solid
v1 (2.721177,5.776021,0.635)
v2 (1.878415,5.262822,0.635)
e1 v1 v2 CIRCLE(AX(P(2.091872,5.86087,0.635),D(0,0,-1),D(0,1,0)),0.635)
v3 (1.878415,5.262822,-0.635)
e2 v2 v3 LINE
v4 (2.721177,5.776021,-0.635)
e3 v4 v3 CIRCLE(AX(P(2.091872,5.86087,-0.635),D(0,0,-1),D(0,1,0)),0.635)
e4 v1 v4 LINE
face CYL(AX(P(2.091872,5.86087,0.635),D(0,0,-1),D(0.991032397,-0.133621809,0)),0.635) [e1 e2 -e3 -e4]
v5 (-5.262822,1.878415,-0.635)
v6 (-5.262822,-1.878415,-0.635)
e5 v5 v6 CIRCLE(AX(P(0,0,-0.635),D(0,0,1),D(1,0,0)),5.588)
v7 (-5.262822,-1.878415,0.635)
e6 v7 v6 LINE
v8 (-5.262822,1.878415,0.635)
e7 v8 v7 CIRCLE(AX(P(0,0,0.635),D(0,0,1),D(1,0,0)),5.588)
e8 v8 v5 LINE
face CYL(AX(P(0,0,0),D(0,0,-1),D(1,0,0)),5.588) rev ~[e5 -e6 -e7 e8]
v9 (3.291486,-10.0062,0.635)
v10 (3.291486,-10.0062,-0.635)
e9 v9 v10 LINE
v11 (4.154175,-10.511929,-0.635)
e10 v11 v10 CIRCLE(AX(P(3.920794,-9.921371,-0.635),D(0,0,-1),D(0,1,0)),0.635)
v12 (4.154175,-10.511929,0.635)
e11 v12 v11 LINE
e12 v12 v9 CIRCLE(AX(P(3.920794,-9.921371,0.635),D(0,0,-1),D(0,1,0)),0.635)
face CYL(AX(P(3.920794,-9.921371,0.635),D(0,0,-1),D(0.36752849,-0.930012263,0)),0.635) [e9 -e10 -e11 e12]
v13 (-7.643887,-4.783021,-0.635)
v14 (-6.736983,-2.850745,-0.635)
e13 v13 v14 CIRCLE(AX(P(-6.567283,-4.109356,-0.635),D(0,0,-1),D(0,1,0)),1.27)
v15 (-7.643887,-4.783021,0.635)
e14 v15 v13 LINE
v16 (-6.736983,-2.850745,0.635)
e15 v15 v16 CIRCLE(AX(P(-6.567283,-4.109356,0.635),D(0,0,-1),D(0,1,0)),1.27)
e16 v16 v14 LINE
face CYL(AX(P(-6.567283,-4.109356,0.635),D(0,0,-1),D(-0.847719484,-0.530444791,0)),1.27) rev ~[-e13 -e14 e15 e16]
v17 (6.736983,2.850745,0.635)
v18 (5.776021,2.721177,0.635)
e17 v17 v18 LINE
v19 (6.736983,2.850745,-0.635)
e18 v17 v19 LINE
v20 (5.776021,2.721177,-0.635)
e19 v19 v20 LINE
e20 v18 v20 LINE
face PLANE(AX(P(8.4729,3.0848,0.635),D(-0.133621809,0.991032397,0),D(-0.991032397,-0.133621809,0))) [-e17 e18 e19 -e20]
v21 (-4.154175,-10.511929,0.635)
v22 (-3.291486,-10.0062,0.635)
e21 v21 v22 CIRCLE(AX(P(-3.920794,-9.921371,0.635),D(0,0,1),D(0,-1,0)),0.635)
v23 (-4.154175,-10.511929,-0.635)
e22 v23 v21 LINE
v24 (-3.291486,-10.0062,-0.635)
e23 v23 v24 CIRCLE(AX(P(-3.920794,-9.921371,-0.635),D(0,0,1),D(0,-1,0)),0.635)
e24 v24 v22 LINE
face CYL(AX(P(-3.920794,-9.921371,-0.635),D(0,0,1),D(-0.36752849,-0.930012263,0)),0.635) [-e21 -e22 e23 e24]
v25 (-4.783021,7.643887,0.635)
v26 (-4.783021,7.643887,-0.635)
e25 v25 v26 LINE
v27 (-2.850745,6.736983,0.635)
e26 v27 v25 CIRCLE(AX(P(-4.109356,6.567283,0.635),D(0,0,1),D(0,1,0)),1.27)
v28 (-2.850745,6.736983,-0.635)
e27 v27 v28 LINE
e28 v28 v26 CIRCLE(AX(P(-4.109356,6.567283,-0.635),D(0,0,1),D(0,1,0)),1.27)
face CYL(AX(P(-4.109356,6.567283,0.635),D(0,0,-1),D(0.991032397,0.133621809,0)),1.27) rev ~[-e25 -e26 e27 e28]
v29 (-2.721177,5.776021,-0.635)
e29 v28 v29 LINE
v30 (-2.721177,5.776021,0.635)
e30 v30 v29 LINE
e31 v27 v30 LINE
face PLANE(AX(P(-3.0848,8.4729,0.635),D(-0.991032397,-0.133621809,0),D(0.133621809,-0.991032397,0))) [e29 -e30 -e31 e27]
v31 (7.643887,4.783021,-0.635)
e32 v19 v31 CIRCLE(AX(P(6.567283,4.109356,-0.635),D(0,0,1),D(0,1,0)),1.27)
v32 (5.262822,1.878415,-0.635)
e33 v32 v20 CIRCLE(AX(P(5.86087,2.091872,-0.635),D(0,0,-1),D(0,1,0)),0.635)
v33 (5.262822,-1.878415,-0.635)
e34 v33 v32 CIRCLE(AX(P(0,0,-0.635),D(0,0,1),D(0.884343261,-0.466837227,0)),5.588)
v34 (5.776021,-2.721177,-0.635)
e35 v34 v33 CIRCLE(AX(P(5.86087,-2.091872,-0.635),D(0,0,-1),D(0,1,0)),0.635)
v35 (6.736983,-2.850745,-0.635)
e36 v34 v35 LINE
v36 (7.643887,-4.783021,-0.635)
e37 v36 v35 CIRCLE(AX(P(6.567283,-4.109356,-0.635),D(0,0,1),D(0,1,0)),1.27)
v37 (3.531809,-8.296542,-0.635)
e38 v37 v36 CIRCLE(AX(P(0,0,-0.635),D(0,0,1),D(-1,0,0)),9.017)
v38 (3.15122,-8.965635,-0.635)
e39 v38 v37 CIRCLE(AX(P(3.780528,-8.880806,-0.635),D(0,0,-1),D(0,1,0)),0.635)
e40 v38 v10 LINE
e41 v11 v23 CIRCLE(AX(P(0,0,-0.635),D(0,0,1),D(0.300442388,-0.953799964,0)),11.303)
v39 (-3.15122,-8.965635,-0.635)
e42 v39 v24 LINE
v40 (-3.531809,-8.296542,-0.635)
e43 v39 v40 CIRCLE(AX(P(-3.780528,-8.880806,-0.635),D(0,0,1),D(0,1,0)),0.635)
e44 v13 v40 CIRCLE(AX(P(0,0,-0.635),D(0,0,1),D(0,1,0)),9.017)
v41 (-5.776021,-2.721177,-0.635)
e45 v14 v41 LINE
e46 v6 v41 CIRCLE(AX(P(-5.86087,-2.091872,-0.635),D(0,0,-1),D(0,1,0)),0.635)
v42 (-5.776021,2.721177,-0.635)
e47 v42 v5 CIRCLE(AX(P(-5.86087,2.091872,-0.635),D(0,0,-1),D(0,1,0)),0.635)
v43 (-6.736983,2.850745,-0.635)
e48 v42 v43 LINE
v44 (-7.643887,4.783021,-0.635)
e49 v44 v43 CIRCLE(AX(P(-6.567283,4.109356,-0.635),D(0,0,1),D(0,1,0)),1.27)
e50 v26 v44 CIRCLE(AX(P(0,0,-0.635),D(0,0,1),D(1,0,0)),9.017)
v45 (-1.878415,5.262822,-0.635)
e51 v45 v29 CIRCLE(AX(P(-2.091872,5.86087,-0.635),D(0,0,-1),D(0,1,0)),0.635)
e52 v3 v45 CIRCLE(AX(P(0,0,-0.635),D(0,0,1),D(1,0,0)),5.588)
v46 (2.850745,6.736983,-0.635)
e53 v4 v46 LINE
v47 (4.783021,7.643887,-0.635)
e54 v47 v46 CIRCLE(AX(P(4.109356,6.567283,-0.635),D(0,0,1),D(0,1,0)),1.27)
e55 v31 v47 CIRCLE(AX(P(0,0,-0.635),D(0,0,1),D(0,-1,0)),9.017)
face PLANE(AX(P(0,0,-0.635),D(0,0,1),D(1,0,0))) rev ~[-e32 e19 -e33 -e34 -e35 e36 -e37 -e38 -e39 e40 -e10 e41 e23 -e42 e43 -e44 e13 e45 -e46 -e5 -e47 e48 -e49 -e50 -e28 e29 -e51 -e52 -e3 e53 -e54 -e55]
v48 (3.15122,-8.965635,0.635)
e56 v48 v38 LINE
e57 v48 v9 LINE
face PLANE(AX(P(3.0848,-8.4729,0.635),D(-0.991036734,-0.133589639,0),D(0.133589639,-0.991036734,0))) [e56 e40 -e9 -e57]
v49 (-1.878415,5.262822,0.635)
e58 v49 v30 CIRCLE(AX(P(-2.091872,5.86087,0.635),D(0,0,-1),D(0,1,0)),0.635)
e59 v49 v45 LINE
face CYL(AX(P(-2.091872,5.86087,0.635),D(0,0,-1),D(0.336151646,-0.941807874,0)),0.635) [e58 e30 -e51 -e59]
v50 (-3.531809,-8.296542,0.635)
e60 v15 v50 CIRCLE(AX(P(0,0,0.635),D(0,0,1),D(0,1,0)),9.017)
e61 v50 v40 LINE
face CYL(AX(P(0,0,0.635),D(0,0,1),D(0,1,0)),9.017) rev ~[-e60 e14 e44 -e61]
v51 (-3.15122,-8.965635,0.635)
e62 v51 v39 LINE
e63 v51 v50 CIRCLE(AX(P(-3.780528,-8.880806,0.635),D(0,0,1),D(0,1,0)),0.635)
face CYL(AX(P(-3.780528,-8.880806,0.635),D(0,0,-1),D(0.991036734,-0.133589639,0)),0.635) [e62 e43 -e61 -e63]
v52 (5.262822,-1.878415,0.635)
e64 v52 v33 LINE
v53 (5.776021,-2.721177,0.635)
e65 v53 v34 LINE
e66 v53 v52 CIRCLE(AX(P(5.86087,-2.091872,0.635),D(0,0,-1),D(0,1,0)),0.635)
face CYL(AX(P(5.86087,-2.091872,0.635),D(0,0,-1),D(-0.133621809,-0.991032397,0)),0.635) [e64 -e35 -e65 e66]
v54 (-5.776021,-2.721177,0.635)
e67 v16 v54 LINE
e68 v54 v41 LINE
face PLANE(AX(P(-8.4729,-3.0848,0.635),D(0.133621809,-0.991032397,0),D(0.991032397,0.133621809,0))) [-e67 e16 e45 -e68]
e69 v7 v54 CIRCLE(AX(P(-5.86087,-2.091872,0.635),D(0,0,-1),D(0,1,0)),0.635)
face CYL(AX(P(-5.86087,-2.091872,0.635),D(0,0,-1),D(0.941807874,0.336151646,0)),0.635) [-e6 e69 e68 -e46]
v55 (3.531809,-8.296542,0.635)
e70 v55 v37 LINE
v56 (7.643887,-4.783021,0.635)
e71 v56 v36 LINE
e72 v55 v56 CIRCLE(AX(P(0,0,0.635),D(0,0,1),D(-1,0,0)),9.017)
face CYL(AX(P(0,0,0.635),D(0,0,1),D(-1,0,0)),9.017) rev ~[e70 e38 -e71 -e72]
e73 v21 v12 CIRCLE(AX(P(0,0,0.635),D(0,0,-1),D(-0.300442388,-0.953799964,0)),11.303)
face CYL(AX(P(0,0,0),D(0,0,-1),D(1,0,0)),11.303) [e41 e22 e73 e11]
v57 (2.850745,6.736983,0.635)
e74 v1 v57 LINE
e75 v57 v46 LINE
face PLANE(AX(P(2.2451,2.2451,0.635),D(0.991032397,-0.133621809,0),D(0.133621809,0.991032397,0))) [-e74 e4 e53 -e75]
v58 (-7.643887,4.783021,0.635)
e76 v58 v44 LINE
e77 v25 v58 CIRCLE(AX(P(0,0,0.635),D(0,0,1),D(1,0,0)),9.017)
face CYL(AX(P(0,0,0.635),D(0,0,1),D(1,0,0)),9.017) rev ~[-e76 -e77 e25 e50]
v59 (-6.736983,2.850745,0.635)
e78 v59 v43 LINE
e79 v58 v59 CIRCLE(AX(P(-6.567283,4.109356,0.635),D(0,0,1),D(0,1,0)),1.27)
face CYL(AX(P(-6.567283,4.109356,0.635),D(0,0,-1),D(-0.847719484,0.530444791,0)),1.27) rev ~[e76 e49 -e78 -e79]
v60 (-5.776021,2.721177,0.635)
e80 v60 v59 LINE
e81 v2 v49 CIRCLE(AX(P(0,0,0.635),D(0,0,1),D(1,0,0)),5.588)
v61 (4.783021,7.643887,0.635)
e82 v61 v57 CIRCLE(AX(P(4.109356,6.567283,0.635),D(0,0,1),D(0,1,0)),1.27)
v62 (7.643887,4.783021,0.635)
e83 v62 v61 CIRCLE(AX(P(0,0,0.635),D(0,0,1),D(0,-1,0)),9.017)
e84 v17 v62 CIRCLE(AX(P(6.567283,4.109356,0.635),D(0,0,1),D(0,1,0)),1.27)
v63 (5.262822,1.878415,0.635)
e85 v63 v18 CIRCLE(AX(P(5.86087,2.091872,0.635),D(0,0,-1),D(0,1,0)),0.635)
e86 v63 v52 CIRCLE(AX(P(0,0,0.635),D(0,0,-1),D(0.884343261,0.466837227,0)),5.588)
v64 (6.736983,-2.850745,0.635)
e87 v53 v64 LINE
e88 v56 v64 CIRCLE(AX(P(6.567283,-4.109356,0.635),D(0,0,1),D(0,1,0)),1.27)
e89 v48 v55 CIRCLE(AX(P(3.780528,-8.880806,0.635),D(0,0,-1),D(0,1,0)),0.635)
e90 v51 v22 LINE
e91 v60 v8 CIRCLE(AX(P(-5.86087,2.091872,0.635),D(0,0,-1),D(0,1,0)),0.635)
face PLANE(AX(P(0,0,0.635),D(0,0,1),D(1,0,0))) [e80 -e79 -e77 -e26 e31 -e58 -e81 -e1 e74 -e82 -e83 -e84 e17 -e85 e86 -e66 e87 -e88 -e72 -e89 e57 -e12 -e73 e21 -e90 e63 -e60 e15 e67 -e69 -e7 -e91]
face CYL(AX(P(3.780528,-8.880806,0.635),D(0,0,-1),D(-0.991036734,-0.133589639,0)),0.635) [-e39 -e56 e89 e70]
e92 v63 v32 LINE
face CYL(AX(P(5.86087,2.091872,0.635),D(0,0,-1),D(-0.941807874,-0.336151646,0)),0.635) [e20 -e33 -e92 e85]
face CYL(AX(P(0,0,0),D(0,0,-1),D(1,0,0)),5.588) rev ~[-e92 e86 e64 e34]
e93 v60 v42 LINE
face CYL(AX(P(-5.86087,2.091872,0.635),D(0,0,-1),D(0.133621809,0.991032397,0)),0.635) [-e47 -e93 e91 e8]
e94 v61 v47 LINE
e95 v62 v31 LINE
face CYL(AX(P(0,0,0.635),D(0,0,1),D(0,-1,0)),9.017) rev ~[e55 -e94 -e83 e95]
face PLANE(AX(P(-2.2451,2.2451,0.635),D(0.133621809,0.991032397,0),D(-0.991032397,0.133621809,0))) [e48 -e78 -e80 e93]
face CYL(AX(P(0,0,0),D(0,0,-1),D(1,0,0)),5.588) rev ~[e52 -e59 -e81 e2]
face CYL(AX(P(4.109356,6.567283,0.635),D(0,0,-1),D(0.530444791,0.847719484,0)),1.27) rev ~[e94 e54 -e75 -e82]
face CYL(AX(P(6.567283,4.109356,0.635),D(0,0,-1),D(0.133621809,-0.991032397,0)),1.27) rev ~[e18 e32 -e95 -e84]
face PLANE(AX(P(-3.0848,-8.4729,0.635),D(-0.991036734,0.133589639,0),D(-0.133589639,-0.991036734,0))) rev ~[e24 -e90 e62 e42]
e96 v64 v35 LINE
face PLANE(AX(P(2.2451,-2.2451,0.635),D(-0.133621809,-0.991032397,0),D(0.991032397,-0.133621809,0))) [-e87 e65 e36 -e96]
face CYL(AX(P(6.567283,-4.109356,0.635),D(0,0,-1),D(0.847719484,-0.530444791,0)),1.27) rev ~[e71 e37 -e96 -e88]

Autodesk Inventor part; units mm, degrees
ref_plane "YZ Plane" through (0, 0, 0) normal (1, 0, 0) x (0, 1, 0)
ref_plane "XZ Plane" through (0, 0, 0) normal (0, 1, 0) x (-1, 0, 0)
ref_plane "XY Plane" through (0, 0, 0) normal (0, 0, 1) x (1, 0, 0)
sketch "Sketch1" plane through (0, 0, 0) normal (0, 0, 1) x (1, 0, 0)
  circle A0 centre (0, 0) radius 5.588
  circle A1 centre (0, 0) radius 11.303
  dimension "d0" = 11.176
  dimension "d1" = 22.606
extrude "Extrusion1" add sketch "Sketch1" along normal mid plane 1.27
sketch "Sketch2" plane through (0, 0, 0.635) normal (0, 0, 1) x (1, 0, 0)
  circle A0 centre (0, 0) radius 11.303 projected
  circle A1 centre (0, 0) radius 9.017
  line L0 (0, 0) -> (-7.9924, 7.9924) construction
  line L1 (0, 0) -> (-16.0053, 0) construction
  line L2 (-3.0848, 8.4729) -> (-2.2451, 2.2451)
  line L3 (-2.2451, 2.2451) -> (-8.4729, 3.0848)
  dimension "d4" = 2.286
  dimension "d5" = 45
  dimension "d6" = 3.175
  dimension "d7" = 7.62
extrude "Extrusion2" cut sketch "Sketch2" against normal through all contours L2 L3 A1 picked at (-6.1075, 3.3917)
pattern_circular "Circular Pattern1" count 4 over 360 about axis through (0, 0, -10) along (0, 0, 1) of "Extrusion2"
sketch "Sketch3" plane through (0, 0, 0.635) normal (0, 0, 1) x (1, 0, 0)
  line L0 (2.6087, 4.9417) -> (3.0848, 8.4729) projected
  arc A0 (8.4729, 3.0848) -> (3.0848, 8.4729) centre (0, 0) ccw projected
  line L1 (8.4729, 3.0848) -> (4.9417, 2.6087) projected
  arc A1 (4.9417, -2.6087) -> (4.9417, 2.6087) centre (0, 0) ccw projected
  line L2 (4.9417, -2.6087) -> (8.4729, -3.0848) projected
  arc A2 (3.0848, -8.4729) -> (8.4729, -3.0848) centre (0, 0) ccw projected
  line L3 (3.0848, -8.4729) -> (2.6087, -4.9417) projected
  arc A3 (-2.6087, -4.9417) -> (2.6087, -4.9417) centre (0, 0) ccw projected
  line L4 (-2.6087, -4.9417) -> (-3.0848, -8.4729) projected
  arc A4 (-8.4729, -3.0848) -> (-3.0848, -8.4729) centre (0, 0) ccw projected
  line L5 (-8.4729, -3.0848) -> (-4.9417, -2.6087) projected
  arc A5 (-4.9417, 2.6087) -> (-4.9417, -2.6087) centre (0, 0) ccw projected
  line L6 (-4.9417, 2.6087) -> (-8.4729, 3.0848) projected
  arc A6 (-3.0848, 8.4729) -> (-8.4729, 3.0848) centre (0, 0) ccw projected
  line L7 (-3.0848, 8.4729) -> (-2.6087, 4.9417) projected
  arc A7 (2.6087, 4.9417) -> (-2.6087, 4.9417) centre (0, 0) ccw projected
  circle A8 centre (0, 0) radius 11.303 projected
  line L8 (-3.0848, -8.4729) -> (-3.3959, -10.7808)
  circle A9 centre (0, 0) radius 11.303 projected
  line L9 (3.0848, -8.4729) -> (3.3959, -10.7808)
  line L10 (-2.6087, -4.9417) -> (-3.0848, -8.4729) projected
  line L11 (3.0848, -8.4729) -> (2.6087, -4.9417) projected
extrude "Extrusion3" cut sketch "Sketch3" against normal through all contours L9 A8 L8 L4 A3 L3
fillet "Fillet1" radius 1.27 6 edges at (-8.4729, -3.0848, 0) (8.4729, -3.0848, 0) (8.4729, 3.0848, 0) (3.0848, 8.4729, 0) (-3.0848, 8.4729, 0) (-8.4729, 3.0848, 0)
fillet "Fillet1" radius 0.635 10 edges at (-4.9417, -2.6087, 0) (-4.9417, 2.6087, 0) (-2.6087, 4.9417, 0) (2.6087, 4.9417, 0) (4.9417, 2.6087, 0) (4.9417, -2.6087, 0) (-3.0848, -8.4729, 0) (-3.3959, -10.7808, 0) (3.3959, -10.7808, 0) (3.0848, -8.4729, 0)
properties part number "External Klipring for 500 shaft (am-0206)" material "Steel, Carbon"
